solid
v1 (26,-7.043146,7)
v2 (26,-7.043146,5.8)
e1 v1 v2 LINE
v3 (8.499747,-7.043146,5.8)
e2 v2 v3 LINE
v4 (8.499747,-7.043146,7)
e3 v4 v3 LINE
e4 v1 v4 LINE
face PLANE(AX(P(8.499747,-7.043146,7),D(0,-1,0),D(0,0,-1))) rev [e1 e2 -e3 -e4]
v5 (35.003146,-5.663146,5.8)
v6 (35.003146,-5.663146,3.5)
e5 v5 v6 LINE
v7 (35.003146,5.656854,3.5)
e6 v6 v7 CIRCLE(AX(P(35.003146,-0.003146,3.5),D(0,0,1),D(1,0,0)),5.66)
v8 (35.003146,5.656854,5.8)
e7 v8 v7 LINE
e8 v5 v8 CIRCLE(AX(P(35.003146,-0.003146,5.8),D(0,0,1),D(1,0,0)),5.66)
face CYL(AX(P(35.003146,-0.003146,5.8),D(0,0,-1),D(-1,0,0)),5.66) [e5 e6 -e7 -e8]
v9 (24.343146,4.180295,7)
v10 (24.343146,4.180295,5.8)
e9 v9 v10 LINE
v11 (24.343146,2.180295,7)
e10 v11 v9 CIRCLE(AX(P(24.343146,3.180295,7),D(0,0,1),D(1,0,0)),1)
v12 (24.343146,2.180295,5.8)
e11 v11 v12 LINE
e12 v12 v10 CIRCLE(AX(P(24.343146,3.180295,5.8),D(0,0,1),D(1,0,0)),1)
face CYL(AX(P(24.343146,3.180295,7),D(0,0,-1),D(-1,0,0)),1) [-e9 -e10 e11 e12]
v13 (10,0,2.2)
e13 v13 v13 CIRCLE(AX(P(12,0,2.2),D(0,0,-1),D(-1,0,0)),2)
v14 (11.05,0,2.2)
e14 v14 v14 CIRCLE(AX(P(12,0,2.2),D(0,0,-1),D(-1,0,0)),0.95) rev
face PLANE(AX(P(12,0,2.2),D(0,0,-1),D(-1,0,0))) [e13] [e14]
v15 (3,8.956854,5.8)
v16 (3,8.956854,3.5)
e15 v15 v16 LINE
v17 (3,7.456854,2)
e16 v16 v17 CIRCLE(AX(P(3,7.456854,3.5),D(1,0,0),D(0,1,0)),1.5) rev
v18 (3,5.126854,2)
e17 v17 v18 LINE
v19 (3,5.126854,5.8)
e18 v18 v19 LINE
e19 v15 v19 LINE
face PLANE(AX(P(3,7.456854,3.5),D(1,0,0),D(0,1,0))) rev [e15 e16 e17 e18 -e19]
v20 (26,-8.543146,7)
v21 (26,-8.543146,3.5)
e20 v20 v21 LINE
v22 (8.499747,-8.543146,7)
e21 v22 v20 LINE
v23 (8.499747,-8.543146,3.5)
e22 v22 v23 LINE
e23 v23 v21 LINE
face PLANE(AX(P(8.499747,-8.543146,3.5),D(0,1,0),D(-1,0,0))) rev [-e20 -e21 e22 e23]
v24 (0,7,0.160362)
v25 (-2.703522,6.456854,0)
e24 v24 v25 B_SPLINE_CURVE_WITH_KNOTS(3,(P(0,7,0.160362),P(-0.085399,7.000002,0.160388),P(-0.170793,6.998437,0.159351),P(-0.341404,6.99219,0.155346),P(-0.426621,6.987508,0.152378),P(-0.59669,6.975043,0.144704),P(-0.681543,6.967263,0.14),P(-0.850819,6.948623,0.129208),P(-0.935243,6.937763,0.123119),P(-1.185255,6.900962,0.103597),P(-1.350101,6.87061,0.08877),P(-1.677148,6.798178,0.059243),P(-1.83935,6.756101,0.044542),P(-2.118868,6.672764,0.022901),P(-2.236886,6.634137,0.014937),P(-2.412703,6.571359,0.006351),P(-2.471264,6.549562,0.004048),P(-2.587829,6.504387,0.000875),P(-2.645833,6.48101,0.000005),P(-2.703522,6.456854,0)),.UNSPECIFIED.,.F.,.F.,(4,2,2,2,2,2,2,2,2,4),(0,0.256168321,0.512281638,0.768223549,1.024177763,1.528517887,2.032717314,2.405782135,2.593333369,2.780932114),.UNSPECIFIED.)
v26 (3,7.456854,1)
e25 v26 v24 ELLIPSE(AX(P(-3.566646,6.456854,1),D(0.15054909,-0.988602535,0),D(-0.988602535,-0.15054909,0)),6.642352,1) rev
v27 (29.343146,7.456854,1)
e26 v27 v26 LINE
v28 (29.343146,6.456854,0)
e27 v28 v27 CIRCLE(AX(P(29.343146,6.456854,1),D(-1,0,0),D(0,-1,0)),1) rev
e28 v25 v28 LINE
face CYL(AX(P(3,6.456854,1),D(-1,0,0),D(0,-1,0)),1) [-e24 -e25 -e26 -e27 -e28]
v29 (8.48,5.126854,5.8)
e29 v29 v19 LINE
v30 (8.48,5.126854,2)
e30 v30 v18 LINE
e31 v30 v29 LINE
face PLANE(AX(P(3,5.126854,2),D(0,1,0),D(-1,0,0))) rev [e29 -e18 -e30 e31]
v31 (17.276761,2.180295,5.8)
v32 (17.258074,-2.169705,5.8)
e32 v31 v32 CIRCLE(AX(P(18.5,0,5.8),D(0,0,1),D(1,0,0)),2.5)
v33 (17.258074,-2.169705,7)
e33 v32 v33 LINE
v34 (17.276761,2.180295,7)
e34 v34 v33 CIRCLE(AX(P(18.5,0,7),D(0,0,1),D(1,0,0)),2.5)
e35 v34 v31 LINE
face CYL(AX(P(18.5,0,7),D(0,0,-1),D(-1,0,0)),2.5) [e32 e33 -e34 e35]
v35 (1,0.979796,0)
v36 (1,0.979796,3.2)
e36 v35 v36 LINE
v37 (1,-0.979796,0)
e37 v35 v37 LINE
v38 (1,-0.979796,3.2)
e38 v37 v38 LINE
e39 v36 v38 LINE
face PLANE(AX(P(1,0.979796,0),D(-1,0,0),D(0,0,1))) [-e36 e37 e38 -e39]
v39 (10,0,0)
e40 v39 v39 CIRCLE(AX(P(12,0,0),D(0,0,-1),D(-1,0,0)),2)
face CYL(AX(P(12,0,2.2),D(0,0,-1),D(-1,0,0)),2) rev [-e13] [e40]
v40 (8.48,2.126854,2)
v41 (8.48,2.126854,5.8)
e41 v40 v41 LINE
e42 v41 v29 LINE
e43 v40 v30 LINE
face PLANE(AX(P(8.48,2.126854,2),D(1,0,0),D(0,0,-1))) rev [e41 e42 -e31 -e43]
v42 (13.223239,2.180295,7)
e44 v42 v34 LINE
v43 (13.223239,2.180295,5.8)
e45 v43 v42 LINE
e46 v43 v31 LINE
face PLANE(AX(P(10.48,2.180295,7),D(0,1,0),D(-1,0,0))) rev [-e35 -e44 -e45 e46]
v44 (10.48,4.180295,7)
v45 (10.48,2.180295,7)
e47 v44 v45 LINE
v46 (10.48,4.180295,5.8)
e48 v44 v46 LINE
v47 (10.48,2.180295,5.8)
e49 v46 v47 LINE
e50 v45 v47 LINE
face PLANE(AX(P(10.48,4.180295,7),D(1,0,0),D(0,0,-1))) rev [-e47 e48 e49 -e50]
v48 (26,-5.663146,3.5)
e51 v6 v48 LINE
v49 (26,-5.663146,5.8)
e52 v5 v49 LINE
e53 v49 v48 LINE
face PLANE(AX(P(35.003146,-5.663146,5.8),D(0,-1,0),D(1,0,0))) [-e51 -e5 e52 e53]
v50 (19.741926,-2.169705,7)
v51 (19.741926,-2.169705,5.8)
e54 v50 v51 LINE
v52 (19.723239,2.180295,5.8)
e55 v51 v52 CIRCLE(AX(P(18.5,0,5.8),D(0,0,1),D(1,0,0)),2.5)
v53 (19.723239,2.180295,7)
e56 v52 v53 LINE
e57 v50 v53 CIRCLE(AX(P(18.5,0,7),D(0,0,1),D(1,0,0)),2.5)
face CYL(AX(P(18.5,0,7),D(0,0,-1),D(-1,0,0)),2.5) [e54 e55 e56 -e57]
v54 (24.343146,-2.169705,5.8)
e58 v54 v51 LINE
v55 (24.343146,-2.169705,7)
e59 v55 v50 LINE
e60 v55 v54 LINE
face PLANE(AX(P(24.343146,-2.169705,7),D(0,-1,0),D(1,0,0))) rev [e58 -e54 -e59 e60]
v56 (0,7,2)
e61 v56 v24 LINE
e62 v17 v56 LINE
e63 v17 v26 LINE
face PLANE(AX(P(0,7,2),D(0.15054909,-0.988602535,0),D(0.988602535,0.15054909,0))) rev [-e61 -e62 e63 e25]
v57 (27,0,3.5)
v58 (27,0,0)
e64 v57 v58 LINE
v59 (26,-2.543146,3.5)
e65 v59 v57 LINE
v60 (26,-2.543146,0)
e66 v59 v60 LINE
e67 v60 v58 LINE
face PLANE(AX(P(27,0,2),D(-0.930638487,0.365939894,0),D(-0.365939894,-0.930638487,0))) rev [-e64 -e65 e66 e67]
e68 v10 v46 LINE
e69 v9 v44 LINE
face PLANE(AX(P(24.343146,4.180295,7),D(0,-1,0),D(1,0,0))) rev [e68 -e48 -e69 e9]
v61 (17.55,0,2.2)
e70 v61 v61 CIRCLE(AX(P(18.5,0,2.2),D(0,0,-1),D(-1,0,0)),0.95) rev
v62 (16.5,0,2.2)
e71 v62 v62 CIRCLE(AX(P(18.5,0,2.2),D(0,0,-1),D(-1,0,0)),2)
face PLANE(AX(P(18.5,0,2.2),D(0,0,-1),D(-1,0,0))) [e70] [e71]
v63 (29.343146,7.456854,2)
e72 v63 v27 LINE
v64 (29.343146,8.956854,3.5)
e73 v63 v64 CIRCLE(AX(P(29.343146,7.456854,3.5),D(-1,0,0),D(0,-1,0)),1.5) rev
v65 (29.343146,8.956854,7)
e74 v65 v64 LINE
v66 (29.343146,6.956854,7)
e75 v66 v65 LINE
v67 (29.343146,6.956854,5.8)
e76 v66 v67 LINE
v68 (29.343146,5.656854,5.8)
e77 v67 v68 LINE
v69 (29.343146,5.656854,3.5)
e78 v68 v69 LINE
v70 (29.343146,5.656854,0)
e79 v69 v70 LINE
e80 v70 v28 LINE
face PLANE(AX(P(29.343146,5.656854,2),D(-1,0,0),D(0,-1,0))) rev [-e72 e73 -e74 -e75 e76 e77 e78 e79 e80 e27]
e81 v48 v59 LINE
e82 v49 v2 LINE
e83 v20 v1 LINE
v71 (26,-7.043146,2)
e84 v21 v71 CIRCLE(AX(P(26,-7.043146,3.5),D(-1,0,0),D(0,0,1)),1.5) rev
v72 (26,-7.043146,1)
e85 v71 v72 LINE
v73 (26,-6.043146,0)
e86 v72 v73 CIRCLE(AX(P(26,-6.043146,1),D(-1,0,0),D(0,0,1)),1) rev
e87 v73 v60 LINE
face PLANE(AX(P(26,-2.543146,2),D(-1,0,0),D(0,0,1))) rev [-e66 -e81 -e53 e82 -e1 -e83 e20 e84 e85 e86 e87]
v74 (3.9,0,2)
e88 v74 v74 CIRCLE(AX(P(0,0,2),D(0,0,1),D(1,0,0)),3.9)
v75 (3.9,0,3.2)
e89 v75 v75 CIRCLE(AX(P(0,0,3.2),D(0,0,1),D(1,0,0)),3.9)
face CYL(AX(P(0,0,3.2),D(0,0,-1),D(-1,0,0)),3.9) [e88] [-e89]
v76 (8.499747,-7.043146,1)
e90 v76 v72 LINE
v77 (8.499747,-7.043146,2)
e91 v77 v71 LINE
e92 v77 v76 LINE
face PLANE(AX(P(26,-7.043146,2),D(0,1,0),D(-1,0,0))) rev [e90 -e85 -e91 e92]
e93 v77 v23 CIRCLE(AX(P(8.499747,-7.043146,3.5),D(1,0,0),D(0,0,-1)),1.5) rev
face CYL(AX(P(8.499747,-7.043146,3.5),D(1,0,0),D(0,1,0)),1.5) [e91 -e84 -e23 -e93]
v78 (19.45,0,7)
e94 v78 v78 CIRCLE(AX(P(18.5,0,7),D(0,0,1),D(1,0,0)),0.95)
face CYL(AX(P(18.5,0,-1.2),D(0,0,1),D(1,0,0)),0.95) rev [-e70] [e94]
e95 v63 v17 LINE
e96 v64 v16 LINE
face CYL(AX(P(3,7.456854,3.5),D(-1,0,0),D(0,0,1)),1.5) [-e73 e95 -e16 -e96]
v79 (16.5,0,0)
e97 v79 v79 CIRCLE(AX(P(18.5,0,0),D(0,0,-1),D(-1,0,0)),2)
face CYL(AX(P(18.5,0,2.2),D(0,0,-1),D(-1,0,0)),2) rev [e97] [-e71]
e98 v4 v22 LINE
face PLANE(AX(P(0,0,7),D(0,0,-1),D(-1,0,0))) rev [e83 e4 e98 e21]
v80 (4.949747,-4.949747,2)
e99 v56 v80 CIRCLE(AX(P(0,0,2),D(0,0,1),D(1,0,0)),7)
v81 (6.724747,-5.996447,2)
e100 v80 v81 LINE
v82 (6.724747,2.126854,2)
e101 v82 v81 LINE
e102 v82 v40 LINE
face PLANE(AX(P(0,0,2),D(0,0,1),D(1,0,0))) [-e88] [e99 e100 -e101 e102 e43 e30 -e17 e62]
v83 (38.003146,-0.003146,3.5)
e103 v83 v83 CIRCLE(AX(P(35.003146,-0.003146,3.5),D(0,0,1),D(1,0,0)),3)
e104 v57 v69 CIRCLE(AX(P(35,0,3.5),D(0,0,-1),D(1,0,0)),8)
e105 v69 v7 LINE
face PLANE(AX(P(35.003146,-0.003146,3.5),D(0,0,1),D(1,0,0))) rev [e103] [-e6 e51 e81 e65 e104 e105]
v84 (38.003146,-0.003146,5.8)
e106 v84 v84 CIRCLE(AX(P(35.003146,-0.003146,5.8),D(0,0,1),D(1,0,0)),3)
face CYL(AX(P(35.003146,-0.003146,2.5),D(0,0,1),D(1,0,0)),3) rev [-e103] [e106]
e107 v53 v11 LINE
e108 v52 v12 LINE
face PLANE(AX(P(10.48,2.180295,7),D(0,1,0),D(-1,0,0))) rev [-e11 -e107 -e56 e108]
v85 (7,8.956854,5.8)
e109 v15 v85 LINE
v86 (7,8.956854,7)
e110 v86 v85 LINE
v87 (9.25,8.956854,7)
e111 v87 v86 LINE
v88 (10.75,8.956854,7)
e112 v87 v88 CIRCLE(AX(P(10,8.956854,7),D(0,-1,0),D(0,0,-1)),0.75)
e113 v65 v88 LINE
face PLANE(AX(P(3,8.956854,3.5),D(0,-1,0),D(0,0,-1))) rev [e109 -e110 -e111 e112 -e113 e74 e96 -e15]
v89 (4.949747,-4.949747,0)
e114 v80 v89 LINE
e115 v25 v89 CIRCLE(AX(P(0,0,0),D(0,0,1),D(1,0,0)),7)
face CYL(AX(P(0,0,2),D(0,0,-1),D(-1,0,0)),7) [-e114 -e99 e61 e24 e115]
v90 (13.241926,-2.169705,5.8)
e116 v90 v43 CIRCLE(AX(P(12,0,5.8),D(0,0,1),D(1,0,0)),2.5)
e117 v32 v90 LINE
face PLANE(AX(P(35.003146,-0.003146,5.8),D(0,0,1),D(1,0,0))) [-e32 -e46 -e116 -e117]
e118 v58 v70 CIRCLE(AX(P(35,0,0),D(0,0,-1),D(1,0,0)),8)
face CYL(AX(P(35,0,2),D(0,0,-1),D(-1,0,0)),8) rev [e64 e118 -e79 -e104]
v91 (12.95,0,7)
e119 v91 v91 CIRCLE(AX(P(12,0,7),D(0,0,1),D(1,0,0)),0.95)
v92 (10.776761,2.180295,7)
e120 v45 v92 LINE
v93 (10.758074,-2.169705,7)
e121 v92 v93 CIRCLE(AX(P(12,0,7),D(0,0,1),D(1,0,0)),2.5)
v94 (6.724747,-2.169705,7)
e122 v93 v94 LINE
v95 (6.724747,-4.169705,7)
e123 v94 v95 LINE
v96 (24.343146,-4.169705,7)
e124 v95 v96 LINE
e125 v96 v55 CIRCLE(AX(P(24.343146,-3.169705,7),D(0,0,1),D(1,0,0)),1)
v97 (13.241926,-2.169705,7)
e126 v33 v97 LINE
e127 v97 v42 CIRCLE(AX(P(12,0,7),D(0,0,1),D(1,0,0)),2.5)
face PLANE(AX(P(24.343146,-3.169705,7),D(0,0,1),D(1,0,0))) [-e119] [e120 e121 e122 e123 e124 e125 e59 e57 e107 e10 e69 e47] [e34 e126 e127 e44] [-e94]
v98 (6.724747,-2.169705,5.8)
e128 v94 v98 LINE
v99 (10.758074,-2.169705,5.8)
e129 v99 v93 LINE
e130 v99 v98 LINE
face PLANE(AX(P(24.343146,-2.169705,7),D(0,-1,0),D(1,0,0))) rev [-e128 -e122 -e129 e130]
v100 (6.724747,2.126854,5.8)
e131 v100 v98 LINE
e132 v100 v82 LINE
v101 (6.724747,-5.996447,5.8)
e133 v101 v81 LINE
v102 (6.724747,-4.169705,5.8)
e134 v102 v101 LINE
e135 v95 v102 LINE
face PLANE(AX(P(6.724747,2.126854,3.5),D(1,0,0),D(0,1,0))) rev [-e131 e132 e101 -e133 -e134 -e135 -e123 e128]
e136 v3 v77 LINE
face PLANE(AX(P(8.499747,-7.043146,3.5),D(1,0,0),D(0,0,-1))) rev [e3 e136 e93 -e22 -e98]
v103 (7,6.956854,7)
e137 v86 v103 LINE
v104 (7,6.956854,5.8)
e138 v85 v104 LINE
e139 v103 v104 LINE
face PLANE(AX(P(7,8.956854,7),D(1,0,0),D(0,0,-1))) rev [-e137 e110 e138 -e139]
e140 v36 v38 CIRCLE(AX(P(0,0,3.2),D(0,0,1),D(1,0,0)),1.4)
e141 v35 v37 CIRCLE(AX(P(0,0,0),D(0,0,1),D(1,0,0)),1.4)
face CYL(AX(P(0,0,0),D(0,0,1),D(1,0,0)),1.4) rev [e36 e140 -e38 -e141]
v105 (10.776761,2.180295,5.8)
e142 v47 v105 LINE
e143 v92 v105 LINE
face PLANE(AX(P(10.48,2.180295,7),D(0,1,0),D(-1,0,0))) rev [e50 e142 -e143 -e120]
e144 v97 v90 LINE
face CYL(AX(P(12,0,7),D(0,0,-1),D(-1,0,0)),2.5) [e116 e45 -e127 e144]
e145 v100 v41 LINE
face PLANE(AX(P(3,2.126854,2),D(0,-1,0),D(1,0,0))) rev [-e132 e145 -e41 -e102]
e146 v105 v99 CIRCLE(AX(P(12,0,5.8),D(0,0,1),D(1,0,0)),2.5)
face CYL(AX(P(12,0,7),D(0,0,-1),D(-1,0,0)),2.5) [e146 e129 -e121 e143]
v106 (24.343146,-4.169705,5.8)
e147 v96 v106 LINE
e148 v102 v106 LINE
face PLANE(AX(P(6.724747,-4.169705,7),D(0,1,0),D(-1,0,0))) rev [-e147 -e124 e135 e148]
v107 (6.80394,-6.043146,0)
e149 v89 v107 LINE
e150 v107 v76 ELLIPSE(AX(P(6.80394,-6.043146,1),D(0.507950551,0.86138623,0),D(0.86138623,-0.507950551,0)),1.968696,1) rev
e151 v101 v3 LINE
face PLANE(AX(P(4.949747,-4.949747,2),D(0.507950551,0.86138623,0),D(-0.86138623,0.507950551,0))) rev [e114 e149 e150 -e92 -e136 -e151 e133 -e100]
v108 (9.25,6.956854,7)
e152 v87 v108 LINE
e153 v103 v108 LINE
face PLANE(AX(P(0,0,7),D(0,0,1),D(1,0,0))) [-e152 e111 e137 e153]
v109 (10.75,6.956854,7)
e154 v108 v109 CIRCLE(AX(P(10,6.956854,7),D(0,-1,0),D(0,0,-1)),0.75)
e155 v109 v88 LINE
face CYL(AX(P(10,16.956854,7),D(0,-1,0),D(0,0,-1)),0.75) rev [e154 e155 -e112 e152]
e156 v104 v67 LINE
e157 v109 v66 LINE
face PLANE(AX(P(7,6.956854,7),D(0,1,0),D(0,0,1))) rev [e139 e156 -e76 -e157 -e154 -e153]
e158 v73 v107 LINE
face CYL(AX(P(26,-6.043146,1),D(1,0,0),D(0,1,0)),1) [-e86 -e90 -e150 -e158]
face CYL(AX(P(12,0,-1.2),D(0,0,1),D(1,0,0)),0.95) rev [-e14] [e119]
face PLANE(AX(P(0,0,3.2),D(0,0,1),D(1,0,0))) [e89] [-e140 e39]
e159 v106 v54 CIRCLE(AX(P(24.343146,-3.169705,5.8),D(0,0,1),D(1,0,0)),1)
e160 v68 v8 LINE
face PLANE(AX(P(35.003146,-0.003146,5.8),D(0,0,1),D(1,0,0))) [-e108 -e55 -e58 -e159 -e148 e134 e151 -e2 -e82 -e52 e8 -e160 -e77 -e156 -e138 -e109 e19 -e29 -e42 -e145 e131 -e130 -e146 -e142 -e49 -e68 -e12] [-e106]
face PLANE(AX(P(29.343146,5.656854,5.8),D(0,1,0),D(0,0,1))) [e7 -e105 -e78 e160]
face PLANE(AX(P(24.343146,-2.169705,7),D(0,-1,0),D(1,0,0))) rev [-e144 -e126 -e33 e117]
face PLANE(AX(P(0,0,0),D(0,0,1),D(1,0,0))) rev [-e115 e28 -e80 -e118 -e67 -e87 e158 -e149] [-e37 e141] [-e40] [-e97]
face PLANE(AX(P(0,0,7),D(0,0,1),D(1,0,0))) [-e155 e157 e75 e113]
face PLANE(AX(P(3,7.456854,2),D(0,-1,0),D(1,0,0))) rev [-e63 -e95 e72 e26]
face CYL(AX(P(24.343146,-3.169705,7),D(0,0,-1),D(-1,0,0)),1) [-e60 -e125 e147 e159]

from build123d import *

# Parameters (mm, degrees)
BOSS_EXTRUDE1_DEPTH = 2
BOSS_EXTRUDE2_DEPTH = 1.5
BOSS_EXTRUDE3_DEPTH = 2.3
SKETCH6_W           = 5.48
SKETCH6_H           = 3
CUT_EXTRUDE1_DEPTH  = 3.8
SKETCH7_R           = 3
CUT_EXTRUDE2_DEPTH  = 3.3
SKETCH8_W           = 22.343145751
SKETCH8_H           = 2
SKETCH8_W_2         = 17.500252532
SKETCH8_H_2         = 1.5
BOSS_EXTRUDE4_DEPTH = 1.2
SKETCH9_R           = 2.5
BOSS_EXTRUDE5_DEPTH = 1.2
SKETCH10_R          = 0.95
CUT_EXTRUDE3_DEPTH  = 8.2
SKETCH11_R          = 2
CUT_EXTRUDE4_DEPTH  = 2.2
SKETCH12_R          = 3.9
BOSS_EXTRUDE6_DEPTH = 1.2
CUT_EXTRUDE5_DEPTH  = 3.2
FILLET1_R           = 1.5
FILLET2_R           = 1
SKETCH15_R          = 0.75
CUT_EXTRUDE6_DEPTH  = 10


with BuildPart() as part:
    # Sketch2 → Boss-Extrude1 (new body)
    with BuildSketch(Plane.XY):
        with BuildLine():
            Line((0, 7), (3, 7.456854249))
            Line((3, 7.456854249), (29.343145751, 7.456854249))
            Line((29.343145751, 7.456854249), (29.343145751, 5.656854249))
            ThreePointArc((29.343145751, 5.656854249), (27.60896374, 3.061467459), (27, 0))
            Line((27, 0), (26, -2.543145751))
            Line((26, -2.543145751), (26, -7.043145751))
            Line((26, -7.043145751), (8.499747468, -7.043145751))
            Line((8.499747468, -7.043145751), (4.949747468, -4.949747468))
            ThreePointArc((4.949747468, -4.949747468), (-6.467156728, -2.678784027), (0, 7))
        make_face()
    extrude(amount=BOSS_EXTRUDE1_DEPTH)

    # Sketch3 → Boss-Extrude2 (add)
    with BuildSketch(Plane.XY.offset(2)):
        with BuildLine():
            Line((29.343145751, 7.456854249), (29.343145751, 5.656854249))
            ThreePointArc((29.343145751, 5.656854249), (27.60896374, 3.061467459), (27, 0))
            Line((27, 0), (26, -2.543145751))
            Line((26, -2.543145751), (26, -7.043145751))
            Line((26, -7.043145751), (26, -8.543145751))
            Line((26, -8.543145751), (8.499747468, -8.543145751))
            Line((8.499747468, -8.543145751), (8.499747468, -7.043145751))
            Line((8.499747468, -7.043145751), (6.724747468, -5.996446609))
            Line((6.724747468, -5.996446609), (6.724747468, 2.126854249))
            Line((6.724747468, 2.126854249), (3, 2.126854249))
            Line((3, 2.126854249), (3, 7.456854249))
            Line((3, 7.456854249), (3, 8.956854249))
            Line((3, 8.956854249), (29.343145751, 8.956854249))
            Line((29.343145751, 8.956854249), (29.343145751, 7.456854249))
        make_face()
    extrude(amount=BOSS_EXTRUDE2_DEPTH)

    # Sketch5 → Boss-Extrude3 (add)
    with BuildSketch(Plane.XY.offset(3.5)):
        with BuildLine():
            Line((3, 7.5), (3, 2.126854249))
            Line((3, 2.126854249), (6.724747468, 2.126854249))
            Line((6.724747468, 2.126854249), (6.724747468, -5.996446609))
            Line((6.724747468, -5.996446609), (8.499747468, -7.043145751))
            Line((8.499747468, -7.043145751), (8.499747468, -8.543145751))
            Line((8.499747468, -8.543145751), (26, -8.543145751))
            Line((26, -8.543145751), (26, -5.663145751))
            Line((26, -5.663145751), (35.003145751, -5.663145751))
            ThreePointArc((35.003145751, -5.663145751), (40.663145751, -0.003145751), (35.003145751, 5.656854249))
            Line((35.003145751, 5.656854249), (29.343145751, 5.656854249))
            Line((29.343145751, 5.656854249), (29.343145751, 7.5))
            Line((29.343145751, 7.5), (29.343145751, 8.956854249))
            Line((29.343145751, 8.956854249), (3, 8.956854249))
            Line((3, 8.956854249), (3, 7.5))
        make_face()
    extrude(amount=BOSS_EXTRUDE3_DEPTH)

    # Sketch6 → Cut-Extrude1 (cut)
    with BuildSketch(Plane.XY.offset(5.8)):
        with Locations((5.74, 3.626854249)):
            Rectangle(SKETCH6_W, SKETCH6_H)
    extrude(amount=-CUT_EXTRUDE1_DEPTH, mode=Mode.SUBTRACT)

    # Sketch7 → Cut-Extrude2 (cut)
    with BuildSketch(Plane.XY.offset(5.8)):
        with Locations((35.003145751, -0.003145751)):
            Circle(SKETCH7_R)
    extrude(amount=-CUT_EXTRUDE2_DEPTH, mode=Mode.SUBTRACT)

    # Sketch8 → Boss-Extrude4 (add)
    with BuildSketch(Plane.XY.offset(5.8)):
        with Locations((18.171572876, 7.956854249)):
            Rectangle(SKETCH8_W, SKETCH8_H)
        with Locations((17.249873734, -7.793145751)):
            Rectangle(SKETCH8_W_2, SKETCH8_H_2)
        with BuildLine():
            Line((6.724747468, -4.169704782), (24.343145751, -4.169704782))
            ThreePointArc((24.343145751, -4.169704782), (25.343145751, -3.169704782), (24.343145751, -2.169704782))
            Line((24.343145751, -2.169704782), (6.724747468, -2.169704782))
            Line((6.724747468, -2.169704782), (6.724747468, -4.169704782))
        make_face()
        with BuildLine():
            Line((24.343145751, 4.180295218), (10.48, 4.180295218))
            Line((10.48, 4.180295218), (10.48, 2.180295218))
            Line((10.48, 2.180295218), (24.343145751, 2.180295218))
            ThreePointArc((24.343145751, 2.180295218), (25.343145751, 3.180295218), (24.343145751, 4.180295218))
        make_face()
    extrude(amount=BOSS_EXTRUDE4_DEPTH)

    # Sketch9 → Boss-Extrude5 (add)
    with BuildSketch(Plane.XY.offset(5.8)):
        with Locations((18.5, 0)):
            Circle(SKETCH9_R)
        with Locations((12, 0)):
            Circle(SKETCH9_R)
    extrude(amount=BOSS_EXTRUDE5_DEPTH)

    # Sketch10 → Cut-Extrude3 (cut)
    with BuildSketch(Plane.XY.offset(7)):
        with Locations((18.5, 0)):
            Circle(SKETCH10_R)
        with Locations((12, 0)):
            Circle(SKETCH10_R)
    extrude(amount=-CUT_EXTRUDE3_DEPTH, mode=Mode.SUBTRACT)

    # Sketch11 → Cut-Extrude4 (cut)
    with BuildSketch(Plane(origin=(0, 0, 0), x_dir=(-1, 0, 0), z_dir=(0, 0, -1))):
        with Locations((-12, 0)):
            Circle(SKETCH11_R)
        with Locations((-18.5, 0)):
            Circle(SKETCH11_R)
    extrude(amount=-CUT_EXTRUDE4_DEPTH, mode=Mode.SUBTRACT)

    # Sketch12 → Boss-Extrude6 (add)
    with BuildSketch(Plane.XY.offset(2)):
        Circle(SKETCH12_R)
    extrude(amount=BOSS_EXTRUDE6_DEPTH)

    # Sketch14 → Cut-Extrude5 (cut)
    with BuildSketch(Plane.XY.offset(3.2)):
        with BuildLine():
            Line((1, 0.979795897), (1, -0.979795897))
            ThreePointArc((1, -0.979795897), (-1.4, 0), (1, 0.979795897))
        make_face()
    extrude(amount=-CUT_EXTRUDE5_DEPTH, mode=Mode.SUBTRACT)

    # Fillet1
    fillet1_edges = [part.edges().sort_by_distance(p)[0] for p in [
        (16.171572875, 8.956854249, 2),
        (17.249873734, -8.543145751, 2),
    ]]
    fillet(fillet1_edges, radius=FILLET1_R - 0.0001)  # a hair under: the kernel refuses the full size

    # Fillet2
    fillet2_edges = [part.edges().sort_by_distance(p)[0] for p in [
        (17.249873734, -7.043145751, 0),
        (16.171572875, 7.456854249, 0),
    ]]
    fillet(fillet2_edges, radius=FILLET2_R)

    # Sketch15 → Cut-Extrude6 (cut)
    with BuildSketch(Plane.XZ.offset(-6.956854249)):
        with Locations((10, 7)):
            Circle(SKETCH15_R)
    extrude(amount=-CUT_EXTRUDE6_DEPTH, mode=Mode.SUBTRACT)


solid = part.part
